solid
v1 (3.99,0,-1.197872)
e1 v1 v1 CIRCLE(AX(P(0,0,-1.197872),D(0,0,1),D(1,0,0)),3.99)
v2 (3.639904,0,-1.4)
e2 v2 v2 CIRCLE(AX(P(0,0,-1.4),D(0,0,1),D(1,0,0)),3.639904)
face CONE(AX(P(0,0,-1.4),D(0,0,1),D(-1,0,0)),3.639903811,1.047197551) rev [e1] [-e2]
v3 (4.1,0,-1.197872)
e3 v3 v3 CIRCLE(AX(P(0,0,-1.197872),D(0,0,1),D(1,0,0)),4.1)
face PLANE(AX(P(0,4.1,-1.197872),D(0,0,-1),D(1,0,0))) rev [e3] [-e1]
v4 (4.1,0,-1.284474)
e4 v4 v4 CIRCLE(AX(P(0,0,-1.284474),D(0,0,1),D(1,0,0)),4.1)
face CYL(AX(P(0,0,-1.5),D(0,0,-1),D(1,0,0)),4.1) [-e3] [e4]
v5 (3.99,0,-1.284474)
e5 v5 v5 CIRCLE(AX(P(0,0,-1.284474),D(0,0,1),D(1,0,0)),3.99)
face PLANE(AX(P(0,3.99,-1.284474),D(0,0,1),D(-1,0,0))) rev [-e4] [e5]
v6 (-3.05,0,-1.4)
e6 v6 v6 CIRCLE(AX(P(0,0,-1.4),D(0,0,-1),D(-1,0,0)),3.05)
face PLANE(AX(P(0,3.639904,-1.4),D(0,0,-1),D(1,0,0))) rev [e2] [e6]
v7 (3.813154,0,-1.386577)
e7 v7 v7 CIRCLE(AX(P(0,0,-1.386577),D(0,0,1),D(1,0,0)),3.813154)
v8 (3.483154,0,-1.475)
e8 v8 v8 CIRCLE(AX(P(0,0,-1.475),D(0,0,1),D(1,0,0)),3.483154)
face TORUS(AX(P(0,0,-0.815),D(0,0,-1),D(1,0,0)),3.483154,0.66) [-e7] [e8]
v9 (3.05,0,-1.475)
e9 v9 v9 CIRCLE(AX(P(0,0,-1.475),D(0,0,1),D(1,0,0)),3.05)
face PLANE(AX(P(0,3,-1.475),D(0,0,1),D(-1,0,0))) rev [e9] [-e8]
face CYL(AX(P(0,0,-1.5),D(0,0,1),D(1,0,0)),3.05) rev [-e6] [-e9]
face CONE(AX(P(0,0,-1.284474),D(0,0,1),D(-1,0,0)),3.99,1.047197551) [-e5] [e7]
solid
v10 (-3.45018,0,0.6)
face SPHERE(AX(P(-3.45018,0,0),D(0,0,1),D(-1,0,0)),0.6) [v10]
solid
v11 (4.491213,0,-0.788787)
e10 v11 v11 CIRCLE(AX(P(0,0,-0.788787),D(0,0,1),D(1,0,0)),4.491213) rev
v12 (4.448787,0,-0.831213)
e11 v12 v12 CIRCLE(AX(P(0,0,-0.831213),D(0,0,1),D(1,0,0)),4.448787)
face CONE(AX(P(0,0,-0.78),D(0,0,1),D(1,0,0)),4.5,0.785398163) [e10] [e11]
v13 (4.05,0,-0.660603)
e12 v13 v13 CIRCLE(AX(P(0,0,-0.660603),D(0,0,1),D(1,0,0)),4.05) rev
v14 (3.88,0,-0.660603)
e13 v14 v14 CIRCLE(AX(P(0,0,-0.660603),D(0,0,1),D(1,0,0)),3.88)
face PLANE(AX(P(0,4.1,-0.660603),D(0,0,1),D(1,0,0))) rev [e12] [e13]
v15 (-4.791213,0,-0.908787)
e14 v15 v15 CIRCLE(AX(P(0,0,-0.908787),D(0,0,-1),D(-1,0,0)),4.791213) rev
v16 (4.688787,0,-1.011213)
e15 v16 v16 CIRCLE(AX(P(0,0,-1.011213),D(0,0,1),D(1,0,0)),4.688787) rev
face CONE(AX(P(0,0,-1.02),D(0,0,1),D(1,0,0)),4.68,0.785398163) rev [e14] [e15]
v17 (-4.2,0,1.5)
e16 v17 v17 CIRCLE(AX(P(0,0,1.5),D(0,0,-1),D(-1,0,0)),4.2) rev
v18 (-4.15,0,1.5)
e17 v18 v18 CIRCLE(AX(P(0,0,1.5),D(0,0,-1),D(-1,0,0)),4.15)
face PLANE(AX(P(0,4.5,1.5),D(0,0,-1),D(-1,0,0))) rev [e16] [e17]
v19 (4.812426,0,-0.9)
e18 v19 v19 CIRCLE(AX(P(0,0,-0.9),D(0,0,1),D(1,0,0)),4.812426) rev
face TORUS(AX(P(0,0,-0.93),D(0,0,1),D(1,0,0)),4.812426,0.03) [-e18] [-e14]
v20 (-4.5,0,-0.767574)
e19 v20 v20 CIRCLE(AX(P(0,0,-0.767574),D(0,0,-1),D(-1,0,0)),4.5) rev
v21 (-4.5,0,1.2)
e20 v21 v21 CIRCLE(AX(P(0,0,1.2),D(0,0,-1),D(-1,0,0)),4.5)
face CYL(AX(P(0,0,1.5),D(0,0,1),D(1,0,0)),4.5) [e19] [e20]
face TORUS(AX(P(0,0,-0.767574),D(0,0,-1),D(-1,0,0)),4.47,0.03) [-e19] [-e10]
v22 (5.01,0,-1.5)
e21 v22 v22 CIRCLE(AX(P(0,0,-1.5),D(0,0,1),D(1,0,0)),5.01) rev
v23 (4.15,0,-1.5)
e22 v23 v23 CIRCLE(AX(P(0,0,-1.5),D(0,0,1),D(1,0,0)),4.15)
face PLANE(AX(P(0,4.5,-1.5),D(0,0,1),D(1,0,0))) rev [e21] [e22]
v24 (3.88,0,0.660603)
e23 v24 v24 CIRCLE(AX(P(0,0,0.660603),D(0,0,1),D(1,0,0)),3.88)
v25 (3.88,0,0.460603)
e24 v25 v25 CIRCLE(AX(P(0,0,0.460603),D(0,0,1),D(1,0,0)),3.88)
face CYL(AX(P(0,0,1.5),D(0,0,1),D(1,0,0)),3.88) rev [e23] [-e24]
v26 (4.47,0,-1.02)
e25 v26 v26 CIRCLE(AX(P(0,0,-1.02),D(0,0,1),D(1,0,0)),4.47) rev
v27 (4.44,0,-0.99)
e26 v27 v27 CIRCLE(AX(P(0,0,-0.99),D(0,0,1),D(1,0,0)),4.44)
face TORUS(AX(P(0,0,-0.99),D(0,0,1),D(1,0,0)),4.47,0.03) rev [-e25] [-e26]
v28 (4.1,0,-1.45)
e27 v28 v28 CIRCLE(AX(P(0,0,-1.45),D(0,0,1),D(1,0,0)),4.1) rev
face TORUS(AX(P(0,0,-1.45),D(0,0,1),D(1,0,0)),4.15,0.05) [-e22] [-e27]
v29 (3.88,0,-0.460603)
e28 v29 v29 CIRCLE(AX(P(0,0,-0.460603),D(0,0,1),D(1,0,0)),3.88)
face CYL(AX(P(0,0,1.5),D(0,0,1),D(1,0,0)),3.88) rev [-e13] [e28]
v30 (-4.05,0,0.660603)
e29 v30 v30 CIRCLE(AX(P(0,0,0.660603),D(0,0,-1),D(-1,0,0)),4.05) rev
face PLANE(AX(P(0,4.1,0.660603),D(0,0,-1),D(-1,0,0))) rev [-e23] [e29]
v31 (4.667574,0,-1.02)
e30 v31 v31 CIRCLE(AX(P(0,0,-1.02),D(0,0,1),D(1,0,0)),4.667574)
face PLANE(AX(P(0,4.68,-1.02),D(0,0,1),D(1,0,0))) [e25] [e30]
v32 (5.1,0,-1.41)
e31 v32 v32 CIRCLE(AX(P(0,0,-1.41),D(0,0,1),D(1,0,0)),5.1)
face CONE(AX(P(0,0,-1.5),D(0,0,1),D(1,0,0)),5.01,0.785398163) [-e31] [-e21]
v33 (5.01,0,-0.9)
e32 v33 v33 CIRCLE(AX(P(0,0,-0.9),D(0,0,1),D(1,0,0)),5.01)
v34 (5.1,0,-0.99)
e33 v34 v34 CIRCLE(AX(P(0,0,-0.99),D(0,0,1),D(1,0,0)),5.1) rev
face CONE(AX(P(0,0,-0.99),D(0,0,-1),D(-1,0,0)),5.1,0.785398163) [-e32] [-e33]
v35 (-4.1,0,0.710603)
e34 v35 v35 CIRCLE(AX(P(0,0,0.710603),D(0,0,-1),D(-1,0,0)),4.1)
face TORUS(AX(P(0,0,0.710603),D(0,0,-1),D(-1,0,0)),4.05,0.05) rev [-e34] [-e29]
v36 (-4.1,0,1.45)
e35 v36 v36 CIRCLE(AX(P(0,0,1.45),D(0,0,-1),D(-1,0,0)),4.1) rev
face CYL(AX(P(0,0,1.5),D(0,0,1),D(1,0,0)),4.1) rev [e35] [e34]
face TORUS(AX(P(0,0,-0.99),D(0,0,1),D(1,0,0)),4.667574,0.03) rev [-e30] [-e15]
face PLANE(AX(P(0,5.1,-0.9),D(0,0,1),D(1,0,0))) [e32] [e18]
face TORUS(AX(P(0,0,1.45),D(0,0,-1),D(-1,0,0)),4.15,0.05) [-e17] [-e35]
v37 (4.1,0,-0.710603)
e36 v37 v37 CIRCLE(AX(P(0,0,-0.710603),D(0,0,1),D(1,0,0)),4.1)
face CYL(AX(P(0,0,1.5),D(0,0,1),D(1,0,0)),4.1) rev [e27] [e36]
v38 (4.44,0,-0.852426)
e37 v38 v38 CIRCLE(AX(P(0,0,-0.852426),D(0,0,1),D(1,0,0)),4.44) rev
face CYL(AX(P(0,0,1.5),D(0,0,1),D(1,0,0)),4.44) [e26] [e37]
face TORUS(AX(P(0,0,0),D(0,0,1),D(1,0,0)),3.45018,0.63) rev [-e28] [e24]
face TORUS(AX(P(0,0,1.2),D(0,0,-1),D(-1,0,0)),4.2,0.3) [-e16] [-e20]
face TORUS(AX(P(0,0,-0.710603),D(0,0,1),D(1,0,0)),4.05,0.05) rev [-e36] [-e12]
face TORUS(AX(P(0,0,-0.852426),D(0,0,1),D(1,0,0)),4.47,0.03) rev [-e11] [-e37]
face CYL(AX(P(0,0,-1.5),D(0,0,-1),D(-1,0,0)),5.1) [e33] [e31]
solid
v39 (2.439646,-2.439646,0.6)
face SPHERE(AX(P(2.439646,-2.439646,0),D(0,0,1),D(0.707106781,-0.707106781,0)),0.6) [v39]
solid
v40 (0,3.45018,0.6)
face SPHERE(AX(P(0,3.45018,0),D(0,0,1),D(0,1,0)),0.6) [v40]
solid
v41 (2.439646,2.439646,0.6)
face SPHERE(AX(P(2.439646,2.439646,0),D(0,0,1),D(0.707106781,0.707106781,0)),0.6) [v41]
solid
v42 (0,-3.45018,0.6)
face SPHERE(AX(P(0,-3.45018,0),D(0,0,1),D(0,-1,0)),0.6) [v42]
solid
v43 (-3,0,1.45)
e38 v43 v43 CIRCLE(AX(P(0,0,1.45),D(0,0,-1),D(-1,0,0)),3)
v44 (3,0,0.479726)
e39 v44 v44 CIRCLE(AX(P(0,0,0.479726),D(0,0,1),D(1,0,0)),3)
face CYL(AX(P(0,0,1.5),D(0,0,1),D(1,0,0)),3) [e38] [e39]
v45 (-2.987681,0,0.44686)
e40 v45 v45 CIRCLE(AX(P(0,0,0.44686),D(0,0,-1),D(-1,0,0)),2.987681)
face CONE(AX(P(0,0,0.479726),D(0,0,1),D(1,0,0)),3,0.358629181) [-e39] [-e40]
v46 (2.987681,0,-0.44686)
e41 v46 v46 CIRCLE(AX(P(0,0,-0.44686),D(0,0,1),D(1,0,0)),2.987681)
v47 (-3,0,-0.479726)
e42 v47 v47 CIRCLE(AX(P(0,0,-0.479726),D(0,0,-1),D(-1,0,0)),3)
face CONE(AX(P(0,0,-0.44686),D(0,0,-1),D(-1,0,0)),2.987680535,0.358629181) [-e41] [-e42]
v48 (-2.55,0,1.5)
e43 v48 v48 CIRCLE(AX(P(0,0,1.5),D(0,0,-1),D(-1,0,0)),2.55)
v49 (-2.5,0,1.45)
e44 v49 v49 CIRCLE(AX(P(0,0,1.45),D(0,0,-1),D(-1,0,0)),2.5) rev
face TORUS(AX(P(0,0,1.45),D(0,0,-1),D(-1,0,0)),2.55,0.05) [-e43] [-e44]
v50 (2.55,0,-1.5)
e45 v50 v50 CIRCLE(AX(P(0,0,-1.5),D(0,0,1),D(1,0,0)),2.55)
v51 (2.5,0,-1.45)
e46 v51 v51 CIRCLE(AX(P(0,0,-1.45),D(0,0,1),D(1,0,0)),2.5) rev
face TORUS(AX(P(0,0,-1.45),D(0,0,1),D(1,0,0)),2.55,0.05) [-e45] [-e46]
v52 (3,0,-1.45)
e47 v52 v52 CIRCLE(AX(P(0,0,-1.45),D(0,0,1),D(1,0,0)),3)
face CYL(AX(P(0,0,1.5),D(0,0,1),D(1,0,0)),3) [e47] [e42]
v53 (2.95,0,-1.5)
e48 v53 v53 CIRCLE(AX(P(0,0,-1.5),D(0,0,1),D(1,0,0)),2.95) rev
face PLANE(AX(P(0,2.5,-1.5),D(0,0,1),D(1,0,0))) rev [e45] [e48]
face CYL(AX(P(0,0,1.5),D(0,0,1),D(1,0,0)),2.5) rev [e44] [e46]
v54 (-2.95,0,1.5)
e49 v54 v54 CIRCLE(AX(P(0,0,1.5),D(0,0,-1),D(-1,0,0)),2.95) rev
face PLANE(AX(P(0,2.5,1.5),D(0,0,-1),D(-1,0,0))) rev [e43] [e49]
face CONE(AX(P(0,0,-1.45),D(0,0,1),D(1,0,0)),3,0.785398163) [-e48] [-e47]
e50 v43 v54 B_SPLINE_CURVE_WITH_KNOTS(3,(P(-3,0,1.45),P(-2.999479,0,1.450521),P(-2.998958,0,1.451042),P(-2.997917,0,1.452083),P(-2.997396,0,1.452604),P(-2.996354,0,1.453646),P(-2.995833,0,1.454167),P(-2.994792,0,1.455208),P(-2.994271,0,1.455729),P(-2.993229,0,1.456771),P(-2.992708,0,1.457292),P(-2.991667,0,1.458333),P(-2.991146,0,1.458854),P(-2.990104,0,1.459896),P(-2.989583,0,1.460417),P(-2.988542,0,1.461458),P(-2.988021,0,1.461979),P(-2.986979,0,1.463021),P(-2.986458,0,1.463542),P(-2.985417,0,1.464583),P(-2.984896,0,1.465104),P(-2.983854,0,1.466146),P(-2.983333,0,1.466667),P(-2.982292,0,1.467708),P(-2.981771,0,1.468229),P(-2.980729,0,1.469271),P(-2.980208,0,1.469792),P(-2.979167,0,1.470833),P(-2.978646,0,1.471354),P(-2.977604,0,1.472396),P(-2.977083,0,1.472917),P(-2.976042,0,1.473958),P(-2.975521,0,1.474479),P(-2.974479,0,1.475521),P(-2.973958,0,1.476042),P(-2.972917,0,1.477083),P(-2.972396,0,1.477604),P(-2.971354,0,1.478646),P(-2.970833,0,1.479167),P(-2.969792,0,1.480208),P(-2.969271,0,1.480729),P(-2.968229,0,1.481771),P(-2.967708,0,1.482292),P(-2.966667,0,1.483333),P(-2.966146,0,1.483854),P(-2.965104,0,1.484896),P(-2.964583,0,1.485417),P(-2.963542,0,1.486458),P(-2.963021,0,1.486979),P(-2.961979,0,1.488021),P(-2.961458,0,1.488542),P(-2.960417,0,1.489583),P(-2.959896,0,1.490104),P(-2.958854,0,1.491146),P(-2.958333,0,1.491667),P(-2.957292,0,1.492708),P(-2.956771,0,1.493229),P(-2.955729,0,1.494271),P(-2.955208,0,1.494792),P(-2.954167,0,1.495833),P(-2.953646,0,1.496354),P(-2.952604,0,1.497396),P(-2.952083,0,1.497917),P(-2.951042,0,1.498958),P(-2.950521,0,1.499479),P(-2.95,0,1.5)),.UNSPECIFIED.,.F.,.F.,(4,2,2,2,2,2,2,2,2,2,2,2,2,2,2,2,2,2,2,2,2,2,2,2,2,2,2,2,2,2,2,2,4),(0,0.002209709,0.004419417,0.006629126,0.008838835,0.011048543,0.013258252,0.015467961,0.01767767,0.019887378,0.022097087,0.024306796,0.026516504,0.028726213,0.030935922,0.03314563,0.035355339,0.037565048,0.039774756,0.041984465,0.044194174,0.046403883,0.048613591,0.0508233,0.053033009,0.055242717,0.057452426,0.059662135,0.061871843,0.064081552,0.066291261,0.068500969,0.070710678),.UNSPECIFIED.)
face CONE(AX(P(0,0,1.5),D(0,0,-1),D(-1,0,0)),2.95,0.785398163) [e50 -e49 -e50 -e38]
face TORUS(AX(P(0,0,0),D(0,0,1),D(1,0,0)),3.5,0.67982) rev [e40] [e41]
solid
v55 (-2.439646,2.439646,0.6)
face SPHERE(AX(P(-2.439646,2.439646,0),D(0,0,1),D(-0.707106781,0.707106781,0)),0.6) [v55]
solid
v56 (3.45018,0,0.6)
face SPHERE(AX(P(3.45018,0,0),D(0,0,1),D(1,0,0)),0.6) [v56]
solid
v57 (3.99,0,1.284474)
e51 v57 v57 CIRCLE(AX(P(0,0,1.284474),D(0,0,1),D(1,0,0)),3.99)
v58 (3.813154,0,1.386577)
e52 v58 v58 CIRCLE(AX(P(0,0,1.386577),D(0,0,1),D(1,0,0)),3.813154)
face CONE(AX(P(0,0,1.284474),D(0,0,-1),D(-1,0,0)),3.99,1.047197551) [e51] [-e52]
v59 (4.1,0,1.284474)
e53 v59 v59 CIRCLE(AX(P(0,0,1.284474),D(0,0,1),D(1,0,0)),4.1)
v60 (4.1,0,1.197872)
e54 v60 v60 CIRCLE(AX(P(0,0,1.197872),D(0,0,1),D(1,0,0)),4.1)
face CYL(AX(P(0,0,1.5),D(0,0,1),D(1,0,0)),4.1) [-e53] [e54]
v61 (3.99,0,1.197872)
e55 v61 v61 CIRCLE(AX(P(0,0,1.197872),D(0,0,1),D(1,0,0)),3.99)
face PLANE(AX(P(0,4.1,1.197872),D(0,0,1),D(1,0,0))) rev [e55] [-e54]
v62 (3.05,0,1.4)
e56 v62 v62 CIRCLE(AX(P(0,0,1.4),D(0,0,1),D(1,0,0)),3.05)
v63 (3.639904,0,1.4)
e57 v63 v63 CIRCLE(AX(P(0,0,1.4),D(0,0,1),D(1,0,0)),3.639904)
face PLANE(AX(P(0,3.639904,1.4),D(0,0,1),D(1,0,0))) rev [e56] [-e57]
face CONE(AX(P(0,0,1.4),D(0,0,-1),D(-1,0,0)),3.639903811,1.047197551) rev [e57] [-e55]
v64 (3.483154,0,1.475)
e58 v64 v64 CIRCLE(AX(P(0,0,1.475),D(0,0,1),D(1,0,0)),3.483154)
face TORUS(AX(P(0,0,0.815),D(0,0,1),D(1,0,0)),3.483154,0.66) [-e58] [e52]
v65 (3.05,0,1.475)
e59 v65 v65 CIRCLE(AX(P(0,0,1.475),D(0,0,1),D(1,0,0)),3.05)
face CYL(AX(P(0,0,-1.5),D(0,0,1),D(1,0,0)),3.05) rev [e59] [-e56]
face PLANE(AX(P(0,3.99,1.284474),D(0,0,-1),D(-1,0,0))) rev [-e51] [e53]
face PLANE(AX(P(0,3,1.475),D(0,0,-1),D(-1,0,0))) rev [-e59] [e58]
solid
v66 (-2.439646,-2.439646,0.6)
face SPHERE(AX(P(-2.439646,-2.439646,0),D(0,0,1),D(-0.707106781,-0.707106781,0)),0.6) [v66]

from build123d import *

# Parameters (mm, degrees)
CIRPATTERN1_COUNT  = 8
SKETCH9_R          = 3.05
CUT_EXTRUDE1_DEPTH = 8.025
SKETCH7_W          = 0.6
SKETCH7_H          = 1
FILLET2_R          = 0.3
FILLET3_R          = 0.05
FILLET5_R          = 0.03
CHAMFER1_SIZE      = 0.09
FILLET7_R          = 0.05


with BuildPart() as part:
    # Sketch3 → Revolve1 (revolve)
    with BuildSketch(Plane(origin=(0, 0, 0), x_dir=(0, 0, -1), z_dir=(1, 0, 0)), mode=Mode.PRIVATE) as revolve1_sk:
        with BuildLine():
            Line((-1.5, 4.5), (-1.5, 4.1))
            Line((-1.5, 4.1), (-0.660602809, 4.1))
            Line((-0.660602809, 4.1), (-0.660602809, 3.88))
            Line((-0.660602809, 3.88), (-0.460602809, 3.88))
            ThreePointArc((-0.460602809, 3.88), (0, 4.080180209), (0.460602809, 3.88))
            Line((0.460602809, 3.88), (0.660602809, 3.88))
            Line((0.660602809, 3.88), (0.660602809, 4.1))
            Line((0.660602809, 4.1), (1.5, 4.1))
            Line((1.5, 4.1), (1.5, 4.5))
            Line((1.5, 4.5), (-1.5, 4.5))
        make_face()
        with BuildLine():
            Line((1.5, 2.5), (-1.5, 2.5))
            Line((-1.5, 2.5), (-1.5, 3))
            Line((-1.5, 3), (-0.460602809, 3))
            ThreePointArc((-0.460602809, 3), (0, 2.820180209), (0.460602809, 3))
            Line((0.460602809, 3), (1.5, 3))
            Line((1.5, 3), (1.5, 2.5))
        make_face()
    revolve(revolve1_sk.sketch.rotate(Axis((0, 0, 1.5), (0, 0, -1)), 90), axis=Axis((0, 0, 1.5), (0, 0, -1)))

    # Sketch7 → Revolve5 (revolve)
    with BuildSketch(Plane(origin=(0, 0, 0), x_dir=(0, 0, -1), z_dir=(1, 0, 0)), mode=Mode.PRIVATE) as revolve5_sk:
        with Locations((1.2, 4.6)):
            Rectangle(SKETCH7_W, SKETCH7_H)
    revolve(revolve5_sk.sketch.rotate(Axis((0, 0, -1.5), (0, 0, 1)), 270), axis=Axis((0, 0, -1.5), (0, 0, 1)))

    # Fillet2
    fillet2_edges = [part.edges().sort_by_distance(p)[0] for p in [
        (-4.5, 0, 1.5),
    ]]
    fillet(fillet2_edges, radius=FILLET2_R)

    # Fillet3
    fillet3_edges = [part.edges().sort_by_distance(p)[0] for p in [
        (-4.1, 0, 0.660602809),
        (-4.1, 0, 1.5),
        (-4.1, 0, -1.5),
        (-4.1, 0, -0.660602809),
    ]]
    fillet(fillet3_edges, radius=FILLET3_R)

    # Fillet6
    # the kernel refuses this chamfer: 0.05 mm, written as the material it takes off along each edge
    with BuildSketch(Plane(origin=(0, 0, 1.5), x_dir=(1, 0, 0), z_dir=(0, 1, 0))) as fillet6_piece_1:
        with BuildLine():
            Line((2.948585786, -0.001414214), (3.001414214, 0.051414214))
            Line((3.001414214, 0.051414214), (3.002414214, 0.051414214))
            ThreePointArc((3.002414214, 0.051414214), (3.001, 0.025707107), (3.001, 0))
            Line((3.001, 0), (3, -0.001))
            ThreePointArc((3, -0.001), (2.974292893, -0.001), (2.948585786, -0.002414214))
            Line((2.948585786, -0.002414214), (2.948585786, -0.001414214))
        make_face()
    revolve(axis=Axis((0, 0, 1.5), (0, 0, -1)), mode=Mode.SUBTRACT)
    with BuildSketch(Plane(origin=(0, 0, 0.460602809), x_dir=(1, 0, 0), z_dir=(0, 1, 0))) as fillet6_piece_2:
        with BuildLine():
            Line((3.000701982, -0.020995836), (2.986978553, 0.01561573))
            Line((2.986978553, 0.01561573), (2.987732164, 0.016273052))
            ThreePointArc((2.987732164, 0.016273052), (2.99391746, 0.00819064), (3.000735489, 0.000677537))
            Line((3.000735489, 0.000677537), (3.001, 0))
            ThreePointArc((3.001, 0), (3.001, -0.010497918), (3.001701982, -0.020995836))
            Line((3.001701982, -0.020995836), (3.000701982, -0.020995836))
        make_face()
    revolve(axis=Axis((0, 0, 0.460602809), (0, 0, -1)), mode=Mode.SUBTRACT)
    with BuildSketch(Plane(origin=(0, 0, -0.460602809), x_dir=(1, 0, 0), z_dir=(0, 1, 0))) as fillet6_piece_3:
        with BuildLine():
            Line((3.000701982, 0.020995836), (2.986978553, -0.01561573))
            Line((2.986978553, -0.01561573), (2.987732164, -0.016273052))
            ThreePointArc((2.987732164, -0.016273052), (2.99391746, -0.00819064), (3.000735489, -0.000677537))
            Line((3.000735489, -0.000677537), (3.001, 0))
            ThreePointArc((3.001, 0), (3.001, 0.010497918), (3.001701982, 0.020995836))
            Line((3.001701982, 0.020995836), (3.000701982, 0.020995836))
        make_face()
    revolve(axis=Axis((0, 0, -0.460602809), (0, 0, -1)), mode=Mode.SUBTRACT)
    with BuildSketch(Plane(origin=(0, 0, -1.5), x_dir=(1, 0, 0), z_dir=(0, 1, 0))) as fillet6_piece_4:
        with BuildLine():
            Line((3.001414214, -0.051414214), (2.948585786, 0.001414214))
            Line((2.948585786, 0.001414214), (2.948585786, 0.002414214))
            ThreePointArc((2.948585786, 0.002414214), (2.974292893, 0.001), (3, 0.001))
            Line((3, 0.001), (3.001, 0))
            ThreePointArc((3.001, 0), (3.001, -0.025707107), (3.002414214, -0.051414214))
            Line((3.002414214, -0.051414214), (3.001414214, -0.051414214))
        make_face()
    revolve(axis=Axis((0, 0, -1.5), (0, 0, -1)), mode=Mode.SUBTRACT)

    # Sketch8 → Cut-Revolve1 (revolve, cut)
    with BuildSketch(Plane(origin=(0, 0, 0), x_dir=(0, 0, -1), z_dir=(1, 0, 0)), mode=Mode.PRIVATE) as cut_revolve1_sk:
        Polygon((0.9, 4.8), (1.02, 4.68), (1.02, 4.44), (0.84, 4.44), (0.78, 4.5), (0.9, 4.5), align=None)
    revolve(cut_revolve1_sk.sketch.rotate(Axis((0, 0, 1.5), (0, 0, -1)), 270), axis=Axis((0, 0, 1.5), (0, 0, -1)), mode=Mode.SUBTRACT)

    # Fillet5
    fillet5_edges = [part.edges().sort_by_distance(p)[0] for p in [
        (4.8, 0, -0.9),
        (0, 4.5, -0.78),
        (4.44, 0, -0.84),
        (4.44, 0, -1.02),
        (4.68, 0, -1.02),
    ]]
    fillet(fillet5_edges, radius=FILLET5_R)

    # Chamfer1
    chamfer1_edges = [part.edges().sort_by_distance(p)[0] for p in [
        (-5.1, 0, -1.5),
        (-5.1, 0, -0.9),
    ]]
    chamfer(chamfer1_edges, length=CHAMFER1_SIZE)

    # Fillet7
    fillet7_edges = [part.edges().sort_by_distance(p)[0] for p in [
        (-2.5, 0, -1.5),
        (-2.5, 0, 1.5),
    ]]
    fillet(fillet7_edges, radius=FILLET7_R)


with BuildPart() as body_2:
    # Sketch5 → Revolve3 (revolve)
    with BuildSketch(Plane(origin=(0, 0, 0), x_dir=(0, 0, -1), z_dir=(1, 0, 0))):
        with BuildLine():
            Line((-0.6, 3.450180209), (0.6, 3.450180209))
            ThreePointArc((0.6, 3.450180209), (0, 4.050180209), (-0.6, 3.450180209))
        make_face()
    revolve(axis=Axis((0, 3.450180209, 0.6), (0, 0, -1)))


with BuildPart() as cirpattern1_1:
    # CirPattern1: pattern copy
    add(body_2.part.rotate(Axis((0, 0, 0), (0, 0, 1)), 1 * 360 / CIRPATTERN1_COUNT))


with BuildPart() as cirpattern1_2:
    # CirPattern1: pattern copy
    add(body_2.part.rotate(Axis((0, 0, 0), (0, 0, 1)), 2 * 360 / CIRPATTERN1_COUNT))


with BuildPart() as cirpattern1_3:
    # CirPattern1: pattern copy
    add(body_2.part.rotate(Axis((0, 0, 0), (0, 0, 1)), 3 * 360 / CIRPATTERN1_COUNT))


with BuildPart() as cirpattern1_4:
    # CirPattern1: pattern copy
    add(body_2.part.rotate(Axis((0, 0, 0), (0, 0, 1)), 4 * 360 / CIRPATTERN1_COUNT))


with BuildPart() as cirpattern1_5:
    # CirPattern1: pattern copy
    add(body_2.part.rotate(Axis((0, 0, 0), (0, 0, 1)), 5 * 360 / CIRPATTERN1_COUNT))


with BuildPart() as cirpattern1_6:
    # CirPattern1: pattern copy
    add(body_2.part.rotate(Axis((0, 0, 0), (0, 0, 1)), 6 * 360 / CIRPATTERN1_COUNT))


with BuildPart() as cirpattern1_7:
    # CirPattern1: pattern copy
    add(body_2.part.rotate(Axis((0, 0, 0), (0, 0, 1)), 7 * 360 / CIRPATTERN1_COUNT))


with BuildPart() as body_10:
    # Sketch6 → Revolve4 (revolve)
    with BuildSketch(Plane(origin=(0, 0, 0), x_dir=(0, 0, -1), z_dir=(1, 0, 0)), mode=Mode.PRIVATE) as revolve4_sk:
        with BuildLine():
            Line((-1.475, 3), (-1.475, 3.483153533))
            ThreePointArc((-1.475, 3.483153533), (-1.452511045, 3.653974103), (-1.386576766, 3.813153533))
            Line((-1.386576766, 3.813153533), (-1.284474411, 3.99))
            Line((-1.284474411, 3.99), (-1.284474411, 4.1))
            Line((-1.284474411, 4.1), (-1.197871871, 4.1))
            Line((-1.197871871, 4.1), (-1.197871871, 3.99))
            Line((-1.197871871, 3.99), (-1.4, 3.639903811))
            Line((-1.4, 3.639903811), (-1.4, 3))
            Line((-1.4, 3), (-1.475, 3))
        make_face()
    revolve(revolve4_sk.sketch.rotate(Axis((0, 0, 1.5), (0, 0, -1)), 90), axis=Axis((0, 0, 1.5), (0, 0, -1)))


with BuildPart() as body_11:
    # Mirror1: mirrored copy
    add(body_10.part.mirror(Plane.XY))


with BuildPart() as cut_extrude1_tool:
    # Sketch9 → Cut-Extrude1 (new, through all)
    with BuildSketch(Plane.XY.offset(1.475)):
        Circle(SKETCH9_R)
    extrude(amount=-CUT_EXTRUDE1_DEPTH)


with BuildPart() as body_10_1:
    add(body_10.part)

    # Cut-Extrude1: cut by cut_extrude1_tool
    add(cut_extrude1_tool.part, mode=Mode.SUBTRACT)


with BuildPart() as body_11_1:
    add(body_11.part)

    # Cut-Extrude1: cut by cut_extrude1_tool
    add(cut_extrude1_tool.part, mode=Mode.SUBTRACT)


solid = Compound([part.part, body_2.part, cirpattern1_1.part, cirpattern1_2.part, cirpattern1_3.part, cirpattern1_4.part, cirpattern1_5.part, cirpattern1_6.part, cirpattern1_7.part, body_10_1.part, body_11_1.part])
